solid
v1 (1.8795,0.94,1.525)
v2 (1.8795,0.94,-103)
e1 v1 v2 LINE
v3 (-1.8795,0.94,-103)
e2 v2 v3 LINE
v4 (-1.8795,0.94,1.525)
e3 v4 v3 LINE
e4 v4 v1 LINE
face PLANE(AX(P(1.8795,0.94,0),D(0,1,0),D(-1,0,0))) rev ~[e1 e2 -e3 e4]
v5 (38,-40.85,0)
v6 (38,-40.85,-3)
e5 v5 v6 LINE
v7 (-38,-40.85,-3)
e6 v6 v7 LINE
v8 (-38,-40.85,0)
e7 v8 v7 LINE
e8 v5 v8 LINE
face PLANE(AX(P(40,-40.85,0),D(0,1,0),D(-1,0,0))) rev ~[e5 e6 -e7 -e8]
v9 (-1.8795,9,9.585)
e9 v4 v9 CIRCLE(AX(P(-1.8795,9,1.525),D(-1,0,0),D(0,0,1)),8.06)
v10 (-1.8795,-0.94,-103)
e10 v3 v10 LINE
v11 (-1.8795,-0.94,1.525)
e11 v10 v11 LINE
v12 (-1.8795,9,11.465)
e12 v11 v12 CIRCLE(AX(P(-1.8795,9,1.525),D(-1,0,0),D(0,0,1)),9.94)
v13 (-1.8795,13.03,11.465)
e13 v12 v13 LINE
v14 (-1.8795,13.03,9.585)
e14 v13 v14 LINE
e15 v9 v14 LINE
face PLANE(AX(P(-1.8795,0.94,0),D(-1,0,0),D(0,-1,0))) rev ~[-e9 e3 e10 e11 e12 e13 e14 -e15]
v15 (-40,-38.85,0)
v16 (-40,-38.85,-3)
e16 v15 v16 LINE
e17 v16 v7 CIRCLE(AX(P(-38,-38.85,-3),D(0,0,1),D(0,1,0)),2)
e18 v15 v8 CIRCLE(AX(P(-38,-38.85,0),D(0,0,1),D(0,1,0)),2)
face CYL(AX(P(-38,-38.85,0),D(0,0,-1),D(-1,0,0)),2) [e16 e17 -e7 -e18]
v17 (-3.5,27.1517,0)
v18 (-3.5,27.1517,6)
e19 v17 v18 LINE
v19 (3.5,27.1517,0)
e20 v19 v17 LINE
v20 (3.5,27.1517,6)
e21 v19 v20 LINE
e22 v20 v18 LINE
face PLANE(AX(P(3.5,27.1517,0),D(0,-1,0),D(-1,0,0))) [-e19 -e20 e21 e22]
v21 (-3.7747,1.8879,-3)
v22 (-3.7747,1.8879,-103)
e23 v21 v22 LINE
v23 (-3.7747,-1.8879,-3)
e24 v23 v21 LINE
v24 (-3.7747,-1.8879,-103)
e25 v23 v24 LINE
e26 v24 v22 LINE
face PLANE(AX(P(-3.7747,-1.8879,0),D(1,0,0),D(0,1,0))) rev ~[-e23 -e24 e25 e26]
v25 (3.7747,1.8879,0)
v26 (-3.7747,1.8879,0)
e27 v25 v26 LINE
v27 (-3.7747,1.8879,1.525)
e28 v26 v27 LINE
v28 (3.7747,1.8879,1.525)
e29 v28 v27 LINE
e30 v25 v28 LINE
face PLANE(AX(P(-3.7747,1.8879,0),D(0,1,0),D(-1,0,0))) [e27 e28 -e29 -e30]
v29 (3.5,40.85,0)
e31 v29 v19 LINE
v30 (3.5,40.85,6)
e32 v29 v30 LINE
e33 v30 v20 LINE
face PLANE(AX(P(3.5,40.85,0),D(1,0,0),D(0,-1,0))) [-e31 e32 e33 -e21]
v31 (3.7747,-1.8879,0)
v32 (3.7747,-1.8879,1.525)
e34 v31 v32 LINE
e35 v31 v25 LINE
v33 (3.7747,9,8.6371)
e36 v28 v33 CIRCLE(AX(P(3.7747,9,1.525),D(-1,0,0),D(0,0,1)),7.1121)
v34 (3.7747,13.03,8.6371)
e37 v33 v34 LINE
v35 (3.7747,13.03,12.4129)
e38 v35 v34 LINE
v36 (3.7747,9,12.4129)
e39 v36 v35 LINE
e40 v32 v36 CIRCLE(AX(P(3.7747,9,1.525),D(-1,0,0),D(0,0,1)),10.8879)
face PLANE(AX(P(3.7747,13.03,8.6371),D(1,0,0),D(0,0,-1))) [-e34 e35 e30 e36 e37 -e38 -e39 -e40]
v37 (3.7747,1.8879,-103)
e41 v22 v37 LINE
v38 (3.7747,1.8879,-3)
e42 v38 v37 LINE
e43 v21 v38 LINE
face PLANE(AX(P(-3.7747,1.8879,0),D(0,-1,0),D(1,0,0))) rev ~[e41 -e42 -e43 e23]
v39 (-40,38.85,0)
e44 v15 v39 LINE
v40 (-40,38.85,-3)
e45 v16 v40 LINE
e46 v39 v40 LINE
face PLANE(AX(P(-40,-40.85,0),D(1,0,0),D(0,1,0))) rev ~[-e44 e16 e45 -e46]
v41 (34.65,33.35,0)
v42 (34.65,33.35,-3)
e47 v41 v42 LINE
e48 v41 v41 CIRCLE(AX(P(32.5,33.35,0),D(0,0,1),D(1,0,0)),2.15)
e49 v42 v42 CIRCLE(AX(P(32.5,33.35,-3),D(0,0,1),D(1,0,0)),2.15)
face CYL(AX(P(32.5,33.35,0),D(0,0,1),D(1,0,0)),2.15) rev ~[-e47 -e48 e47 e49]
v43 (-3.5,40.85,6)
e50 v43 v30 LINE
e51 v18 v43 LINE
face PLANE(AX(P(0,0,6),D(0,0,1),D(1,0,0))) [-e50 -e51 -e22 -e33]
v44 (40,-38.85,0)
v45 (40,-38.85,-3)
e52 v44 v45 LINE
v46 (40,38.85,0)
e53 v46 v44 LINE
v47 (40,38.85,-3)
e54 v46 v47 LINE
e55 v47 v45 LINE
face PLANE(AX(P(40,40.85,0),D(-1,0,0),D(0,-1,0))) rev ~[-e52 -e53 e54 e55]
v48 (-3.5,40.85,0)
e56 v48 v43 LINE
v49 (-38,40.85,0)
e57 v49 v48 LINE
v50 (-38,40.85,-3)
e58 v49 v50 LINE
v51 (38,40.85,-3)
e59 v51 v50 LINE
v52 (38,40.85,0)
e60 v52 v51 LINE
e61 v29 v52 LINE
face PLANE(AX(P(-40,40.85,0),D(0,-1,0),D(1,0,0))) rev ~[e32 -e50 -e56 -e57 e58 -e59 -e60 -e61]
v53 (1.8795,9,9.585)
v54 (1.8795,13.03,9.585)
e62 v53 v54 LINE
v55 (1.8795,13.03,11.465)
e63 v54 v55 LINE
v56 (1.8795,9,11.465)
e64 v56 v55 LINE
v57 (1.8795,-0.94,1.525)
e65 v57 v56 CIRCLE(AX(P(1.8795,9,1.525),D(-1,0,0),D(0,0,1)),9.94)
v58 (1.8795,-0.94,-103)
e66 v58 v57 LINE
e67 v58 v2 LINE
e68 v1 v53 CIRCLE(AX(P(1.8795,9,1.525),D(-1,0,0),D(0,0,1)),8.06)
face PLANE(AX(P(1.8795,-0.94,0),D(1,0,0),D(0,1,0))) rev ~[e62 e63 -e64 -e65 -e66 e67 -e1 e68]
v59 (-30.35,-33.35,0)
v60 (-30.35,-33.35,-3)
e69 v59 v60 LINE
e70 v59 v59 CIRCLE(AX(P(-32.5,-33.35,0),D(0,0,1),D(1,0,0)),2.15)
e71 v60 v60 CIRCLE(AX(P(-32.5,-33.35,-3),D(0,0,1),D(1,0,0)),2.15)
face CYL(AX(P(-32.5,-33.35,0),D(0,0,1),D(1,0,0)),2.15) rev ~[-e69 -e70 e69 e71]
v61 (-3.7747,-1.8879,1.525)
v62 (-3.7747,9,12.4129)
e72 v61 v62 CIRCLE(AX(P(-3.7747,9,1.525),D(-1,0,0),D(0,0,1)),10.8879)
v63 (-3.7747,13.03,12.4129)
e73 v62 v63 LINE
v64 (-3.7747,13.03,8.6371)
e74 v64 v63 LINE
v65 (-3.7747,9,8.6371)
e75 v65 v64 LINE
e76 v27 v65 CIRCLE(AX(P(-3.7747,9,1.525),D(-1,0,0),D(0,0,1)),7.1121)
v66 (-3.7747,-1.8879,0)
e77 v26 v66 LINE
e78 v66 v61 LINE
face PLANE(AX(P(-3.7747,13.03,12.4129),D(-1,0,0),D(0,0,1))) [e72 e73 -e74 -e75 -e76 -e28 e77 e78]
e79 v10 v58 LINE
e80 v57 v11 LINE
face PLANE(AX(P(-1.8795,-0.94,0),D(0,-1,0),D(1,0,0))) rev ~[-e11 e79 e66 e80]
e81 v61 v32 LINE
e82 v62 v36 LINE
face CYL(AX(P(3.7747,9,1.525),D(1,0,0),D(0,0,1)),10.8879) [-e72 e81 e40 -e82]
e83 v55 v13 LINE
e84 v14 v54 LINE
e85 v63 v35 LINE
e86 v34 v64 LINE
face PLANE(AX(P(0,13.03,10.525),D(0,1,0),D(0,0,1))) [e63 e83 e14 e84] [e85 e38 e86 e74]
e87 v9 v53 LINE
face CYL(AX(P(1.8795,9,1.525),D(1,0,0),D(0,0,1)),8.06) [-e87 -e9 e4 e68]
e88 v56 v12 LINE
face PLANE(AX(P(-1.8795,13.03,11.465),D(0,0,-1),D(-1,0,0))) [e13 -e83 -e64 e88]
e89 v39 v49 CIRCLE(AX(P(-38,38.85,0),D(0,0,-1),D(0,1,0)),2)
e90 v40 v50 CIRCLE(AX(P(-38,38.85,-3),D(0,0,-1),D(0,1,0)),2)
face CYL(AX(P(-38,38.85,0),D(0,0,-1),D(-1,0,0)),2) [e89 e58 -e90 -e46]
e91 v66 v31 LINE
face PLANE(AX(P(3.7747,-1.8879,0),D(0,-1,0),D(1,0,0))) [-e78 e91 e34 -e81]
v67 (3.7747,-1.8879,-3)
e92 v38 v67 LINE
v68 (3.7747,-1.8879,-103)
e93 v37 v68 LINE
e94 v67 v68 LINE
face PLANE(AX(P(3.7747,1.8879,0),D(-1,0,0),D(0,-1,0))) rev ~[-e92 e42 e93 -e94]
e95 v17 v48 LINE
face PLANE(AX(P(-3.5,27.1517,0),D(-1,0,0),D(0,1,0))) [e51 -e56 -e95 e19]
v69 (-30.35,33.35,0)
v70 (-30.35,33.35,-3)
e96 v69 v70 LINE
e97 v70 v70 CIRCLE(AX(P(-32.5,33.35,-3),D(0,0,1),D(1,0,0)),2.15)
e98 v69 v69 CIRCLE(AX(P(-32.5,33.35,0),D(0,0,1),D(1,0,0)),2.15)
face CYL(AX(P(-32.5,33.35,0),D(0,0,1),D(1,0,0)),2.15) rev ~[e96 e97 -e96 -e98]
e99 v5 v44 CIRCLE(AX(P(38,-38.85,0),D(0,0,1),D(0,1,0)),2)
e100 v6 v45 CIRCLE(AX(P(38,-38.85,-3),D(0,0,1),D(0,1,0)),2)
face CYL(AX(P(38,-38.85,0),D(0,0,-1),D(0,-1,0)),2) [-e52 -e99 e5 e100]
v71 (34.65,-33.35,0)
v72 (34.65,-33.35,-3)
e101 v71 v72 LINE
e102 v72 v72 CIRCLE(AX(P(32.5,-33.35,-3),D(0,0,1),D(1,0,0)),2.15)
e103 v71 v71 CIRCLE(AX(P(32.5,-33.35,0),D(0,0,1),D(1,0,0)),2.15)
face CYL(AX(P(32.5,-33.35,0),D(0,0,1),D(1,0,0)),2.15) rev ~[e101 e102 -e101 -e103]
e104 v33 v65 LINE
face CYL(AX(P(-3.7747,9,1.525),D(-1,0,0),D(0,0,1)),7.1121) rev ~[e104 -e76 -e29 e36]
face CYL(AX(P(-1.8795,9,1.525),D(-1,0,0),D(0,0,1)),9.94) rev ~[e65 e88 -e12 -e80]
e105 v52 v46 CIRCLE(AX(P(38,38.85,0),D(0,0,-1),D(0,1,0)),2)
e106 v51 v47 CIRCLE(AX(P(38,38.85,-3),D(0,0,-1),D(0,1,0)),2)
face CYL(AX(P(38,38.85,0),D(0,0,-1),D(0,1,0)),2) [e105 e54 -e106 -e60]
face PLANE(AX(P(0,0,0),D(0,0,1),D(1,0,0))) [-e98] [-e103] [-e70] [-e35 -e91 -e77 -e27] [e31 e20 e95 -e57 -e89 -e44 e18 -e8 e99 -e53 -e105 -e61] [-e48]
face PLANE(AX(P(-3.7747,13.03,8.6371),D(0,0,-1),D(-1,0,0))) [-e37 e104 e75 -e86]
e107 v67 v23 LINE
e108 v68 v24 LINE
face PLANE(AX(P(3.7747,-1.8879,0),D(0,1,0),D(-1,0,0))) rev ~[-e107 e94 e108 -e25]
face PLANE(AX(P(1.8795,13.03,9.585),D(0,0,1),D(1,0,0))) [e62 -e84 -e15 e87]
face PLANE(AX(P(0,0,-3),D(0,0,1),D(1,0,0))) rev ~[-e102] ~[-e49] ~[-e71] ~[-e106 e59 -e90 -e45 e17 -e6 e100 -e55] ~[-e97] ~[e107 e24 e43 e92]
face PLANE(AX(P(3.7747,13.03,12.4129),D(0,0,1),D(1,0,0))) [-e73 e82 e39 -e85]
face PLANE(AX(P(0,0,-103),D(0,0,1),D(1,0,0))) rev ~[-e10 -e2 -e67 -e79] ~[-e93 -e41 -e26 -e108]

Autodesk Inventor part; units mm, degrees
sketch "S-Basis" plane through (0, 0, 0) normal (0, 0, 1) x (1, 0, 0)
  line L0 (0, 57.19) -> (0, -57.19) construction
  line L1 (-56, 0) -> (56, 0) construction
  line L2 (1.8795, -0.94) -> (1.8795, 0.94)
  line L3 (1.8795, 0.94) -> (-1.8795, 0.94)
  line L4 (-1.8795, 0.94) -> (-1.8795, -0.94)
  line L5 (-1.8795, -0.94) -> (1.8795, -0.94)
  line L6 (1.8795, -0.94) -> (-1.8795, 0.94) construction
  line L7 (1.8795, 0.94) -> (-1.8795, -0.94) construction
  line L8 (-40, 40.85) -> (40, 40.85)
  line L9 (40, 40.85) -> (40, -40.85)
  line L10 (40, -40.85) -> (-40, -40.85)
  line L11 (-40, -40.85) -> (-40, 40.85)
  line L12 (-40, 40.85) -> (40, -40.85) construction
  line L13 (40, 40.85) -> (-40, -40.85) construction
  line L14 (-40, 33.35) -> (40, 33.35) construction
  circle A0 centre (0, 33.35) radius 2.5 construction
  line L15 (-40, 13.03) -> (40, 13.03) construction
  line L16 (-3.7747, 1.8879) -> (3.7747, 1.8879)
  line L17 (3.7747, 1.8879) -> (3.7747, -1.8879)
  line L18 (3.7747, -1.8879) -> (-3.7747, -1.8879)
  line L19 (-3.7747, -1.8879) -> (-3.7747, 1.8879)
  line L20 (-3.7747, 1.8879) -> (3.7747, -1.8879) construction
  line L21 (3.7747, 1.8879) -> (-3.7747, -1.8879) construction
  circle A1 centre (-32.5, 33.35) radius 2.15
  circle A2 centre (32.5, 33.35) radius 2.15
  circle A3 centre (-32.5, -33.35) radius 2.15
  circle A4 centre (32.5, -33.35) radius 2.15
  line L22 (-3.5, 40.85) -> (3.5, 40.85)
  line L23 (3.5, 40.85) -> (3.5, 27.1517)
  line L24 (3.5, 27.1517) -> (-3.5, 27.1517)
  line L25 (-3.5, 27.1517) -> (-3.5, 40.85)
  point P0 (0, 0)
  point P1 (0, 40.85)
  dimension "d0" = 81.7
  dimension "d1" = 80
  dimension "d2" = 3.759
  dimension "d3" = 1.88
  dimension "d4" = 7.5
  dimension "d5" = 5
  dimension "d6" = 20.32
  dimension "d7" = 4.3
  dimension "d8" = 32.5
  dimension "d9" = 4.3
  dimension "d10" = 32.5
  dimension "d11" = 7.5
  dimension "d23" = 7
ref_plane "Anschlussebene-Übergang" through (-40, 13.03, 0) normal (0, 1, 0) x (1, 0, 0)
extrude "Ex-Base1" add sketch "S-Basis" against normal blind 3 contours L8 L25 L24 L23 L9 L10 L11 | L8 L23 L24 L25 | L16 L17 L18 L19
extrude "Ex-Probe" add sketch "S-Basis" against normal blind 103 contours L16 L17 L18 L19
sketch "Skizze2" plane through (0, 0, 0) normal (1, 0, 0) x (0, 1, 0)
  line L0 (13.03, 14.8668) -> (13.03, -2.4778) projected
  line L1 (0, 14.8668) -> (0, -2.4778) projected
  line L2 (-4.8428, 0) -> (16.0088, 0) projected
  line L3 (13.03, 10.525) -> (9, 10.525)
  line L4 (0, 0) -> (0, 1.525)
  arc A0 (9, 10.525) -> (0, 1.525) centre (9, 1.525) ccw
  dimension "d18" = 10.525
  dimension "d19" = 9
sweep "Sweep-Anschluss" add profiles "S-Basis" path "Skizze2" path curves L4 A0 L3 contours L16 L17 L18 L19
fillet "Rundung1" radius 2 4 edges at (40, -40.85, -1.5) (-40, -40.85, -1.5) (40, 40.85, -1.5) (-40, 40.85, -1.5)
ref_plane "RWG-X" through (1.8795, 9, 10.525) normal (0, 0, -1) x (-1, 0, 0)
ref_plane "RWG-Y" through (0, 9, 9.585) normal (1, 0, 0) x (0, 0, -1)
extrude "Extrusion3" add sketch "S-Basis" along normal blind 6 contours L8 L23 L24 L25
equation "\"d10\" = d8"
equation "\"d11\" = d4"
properties part number "ProbeAntennaDummy"
